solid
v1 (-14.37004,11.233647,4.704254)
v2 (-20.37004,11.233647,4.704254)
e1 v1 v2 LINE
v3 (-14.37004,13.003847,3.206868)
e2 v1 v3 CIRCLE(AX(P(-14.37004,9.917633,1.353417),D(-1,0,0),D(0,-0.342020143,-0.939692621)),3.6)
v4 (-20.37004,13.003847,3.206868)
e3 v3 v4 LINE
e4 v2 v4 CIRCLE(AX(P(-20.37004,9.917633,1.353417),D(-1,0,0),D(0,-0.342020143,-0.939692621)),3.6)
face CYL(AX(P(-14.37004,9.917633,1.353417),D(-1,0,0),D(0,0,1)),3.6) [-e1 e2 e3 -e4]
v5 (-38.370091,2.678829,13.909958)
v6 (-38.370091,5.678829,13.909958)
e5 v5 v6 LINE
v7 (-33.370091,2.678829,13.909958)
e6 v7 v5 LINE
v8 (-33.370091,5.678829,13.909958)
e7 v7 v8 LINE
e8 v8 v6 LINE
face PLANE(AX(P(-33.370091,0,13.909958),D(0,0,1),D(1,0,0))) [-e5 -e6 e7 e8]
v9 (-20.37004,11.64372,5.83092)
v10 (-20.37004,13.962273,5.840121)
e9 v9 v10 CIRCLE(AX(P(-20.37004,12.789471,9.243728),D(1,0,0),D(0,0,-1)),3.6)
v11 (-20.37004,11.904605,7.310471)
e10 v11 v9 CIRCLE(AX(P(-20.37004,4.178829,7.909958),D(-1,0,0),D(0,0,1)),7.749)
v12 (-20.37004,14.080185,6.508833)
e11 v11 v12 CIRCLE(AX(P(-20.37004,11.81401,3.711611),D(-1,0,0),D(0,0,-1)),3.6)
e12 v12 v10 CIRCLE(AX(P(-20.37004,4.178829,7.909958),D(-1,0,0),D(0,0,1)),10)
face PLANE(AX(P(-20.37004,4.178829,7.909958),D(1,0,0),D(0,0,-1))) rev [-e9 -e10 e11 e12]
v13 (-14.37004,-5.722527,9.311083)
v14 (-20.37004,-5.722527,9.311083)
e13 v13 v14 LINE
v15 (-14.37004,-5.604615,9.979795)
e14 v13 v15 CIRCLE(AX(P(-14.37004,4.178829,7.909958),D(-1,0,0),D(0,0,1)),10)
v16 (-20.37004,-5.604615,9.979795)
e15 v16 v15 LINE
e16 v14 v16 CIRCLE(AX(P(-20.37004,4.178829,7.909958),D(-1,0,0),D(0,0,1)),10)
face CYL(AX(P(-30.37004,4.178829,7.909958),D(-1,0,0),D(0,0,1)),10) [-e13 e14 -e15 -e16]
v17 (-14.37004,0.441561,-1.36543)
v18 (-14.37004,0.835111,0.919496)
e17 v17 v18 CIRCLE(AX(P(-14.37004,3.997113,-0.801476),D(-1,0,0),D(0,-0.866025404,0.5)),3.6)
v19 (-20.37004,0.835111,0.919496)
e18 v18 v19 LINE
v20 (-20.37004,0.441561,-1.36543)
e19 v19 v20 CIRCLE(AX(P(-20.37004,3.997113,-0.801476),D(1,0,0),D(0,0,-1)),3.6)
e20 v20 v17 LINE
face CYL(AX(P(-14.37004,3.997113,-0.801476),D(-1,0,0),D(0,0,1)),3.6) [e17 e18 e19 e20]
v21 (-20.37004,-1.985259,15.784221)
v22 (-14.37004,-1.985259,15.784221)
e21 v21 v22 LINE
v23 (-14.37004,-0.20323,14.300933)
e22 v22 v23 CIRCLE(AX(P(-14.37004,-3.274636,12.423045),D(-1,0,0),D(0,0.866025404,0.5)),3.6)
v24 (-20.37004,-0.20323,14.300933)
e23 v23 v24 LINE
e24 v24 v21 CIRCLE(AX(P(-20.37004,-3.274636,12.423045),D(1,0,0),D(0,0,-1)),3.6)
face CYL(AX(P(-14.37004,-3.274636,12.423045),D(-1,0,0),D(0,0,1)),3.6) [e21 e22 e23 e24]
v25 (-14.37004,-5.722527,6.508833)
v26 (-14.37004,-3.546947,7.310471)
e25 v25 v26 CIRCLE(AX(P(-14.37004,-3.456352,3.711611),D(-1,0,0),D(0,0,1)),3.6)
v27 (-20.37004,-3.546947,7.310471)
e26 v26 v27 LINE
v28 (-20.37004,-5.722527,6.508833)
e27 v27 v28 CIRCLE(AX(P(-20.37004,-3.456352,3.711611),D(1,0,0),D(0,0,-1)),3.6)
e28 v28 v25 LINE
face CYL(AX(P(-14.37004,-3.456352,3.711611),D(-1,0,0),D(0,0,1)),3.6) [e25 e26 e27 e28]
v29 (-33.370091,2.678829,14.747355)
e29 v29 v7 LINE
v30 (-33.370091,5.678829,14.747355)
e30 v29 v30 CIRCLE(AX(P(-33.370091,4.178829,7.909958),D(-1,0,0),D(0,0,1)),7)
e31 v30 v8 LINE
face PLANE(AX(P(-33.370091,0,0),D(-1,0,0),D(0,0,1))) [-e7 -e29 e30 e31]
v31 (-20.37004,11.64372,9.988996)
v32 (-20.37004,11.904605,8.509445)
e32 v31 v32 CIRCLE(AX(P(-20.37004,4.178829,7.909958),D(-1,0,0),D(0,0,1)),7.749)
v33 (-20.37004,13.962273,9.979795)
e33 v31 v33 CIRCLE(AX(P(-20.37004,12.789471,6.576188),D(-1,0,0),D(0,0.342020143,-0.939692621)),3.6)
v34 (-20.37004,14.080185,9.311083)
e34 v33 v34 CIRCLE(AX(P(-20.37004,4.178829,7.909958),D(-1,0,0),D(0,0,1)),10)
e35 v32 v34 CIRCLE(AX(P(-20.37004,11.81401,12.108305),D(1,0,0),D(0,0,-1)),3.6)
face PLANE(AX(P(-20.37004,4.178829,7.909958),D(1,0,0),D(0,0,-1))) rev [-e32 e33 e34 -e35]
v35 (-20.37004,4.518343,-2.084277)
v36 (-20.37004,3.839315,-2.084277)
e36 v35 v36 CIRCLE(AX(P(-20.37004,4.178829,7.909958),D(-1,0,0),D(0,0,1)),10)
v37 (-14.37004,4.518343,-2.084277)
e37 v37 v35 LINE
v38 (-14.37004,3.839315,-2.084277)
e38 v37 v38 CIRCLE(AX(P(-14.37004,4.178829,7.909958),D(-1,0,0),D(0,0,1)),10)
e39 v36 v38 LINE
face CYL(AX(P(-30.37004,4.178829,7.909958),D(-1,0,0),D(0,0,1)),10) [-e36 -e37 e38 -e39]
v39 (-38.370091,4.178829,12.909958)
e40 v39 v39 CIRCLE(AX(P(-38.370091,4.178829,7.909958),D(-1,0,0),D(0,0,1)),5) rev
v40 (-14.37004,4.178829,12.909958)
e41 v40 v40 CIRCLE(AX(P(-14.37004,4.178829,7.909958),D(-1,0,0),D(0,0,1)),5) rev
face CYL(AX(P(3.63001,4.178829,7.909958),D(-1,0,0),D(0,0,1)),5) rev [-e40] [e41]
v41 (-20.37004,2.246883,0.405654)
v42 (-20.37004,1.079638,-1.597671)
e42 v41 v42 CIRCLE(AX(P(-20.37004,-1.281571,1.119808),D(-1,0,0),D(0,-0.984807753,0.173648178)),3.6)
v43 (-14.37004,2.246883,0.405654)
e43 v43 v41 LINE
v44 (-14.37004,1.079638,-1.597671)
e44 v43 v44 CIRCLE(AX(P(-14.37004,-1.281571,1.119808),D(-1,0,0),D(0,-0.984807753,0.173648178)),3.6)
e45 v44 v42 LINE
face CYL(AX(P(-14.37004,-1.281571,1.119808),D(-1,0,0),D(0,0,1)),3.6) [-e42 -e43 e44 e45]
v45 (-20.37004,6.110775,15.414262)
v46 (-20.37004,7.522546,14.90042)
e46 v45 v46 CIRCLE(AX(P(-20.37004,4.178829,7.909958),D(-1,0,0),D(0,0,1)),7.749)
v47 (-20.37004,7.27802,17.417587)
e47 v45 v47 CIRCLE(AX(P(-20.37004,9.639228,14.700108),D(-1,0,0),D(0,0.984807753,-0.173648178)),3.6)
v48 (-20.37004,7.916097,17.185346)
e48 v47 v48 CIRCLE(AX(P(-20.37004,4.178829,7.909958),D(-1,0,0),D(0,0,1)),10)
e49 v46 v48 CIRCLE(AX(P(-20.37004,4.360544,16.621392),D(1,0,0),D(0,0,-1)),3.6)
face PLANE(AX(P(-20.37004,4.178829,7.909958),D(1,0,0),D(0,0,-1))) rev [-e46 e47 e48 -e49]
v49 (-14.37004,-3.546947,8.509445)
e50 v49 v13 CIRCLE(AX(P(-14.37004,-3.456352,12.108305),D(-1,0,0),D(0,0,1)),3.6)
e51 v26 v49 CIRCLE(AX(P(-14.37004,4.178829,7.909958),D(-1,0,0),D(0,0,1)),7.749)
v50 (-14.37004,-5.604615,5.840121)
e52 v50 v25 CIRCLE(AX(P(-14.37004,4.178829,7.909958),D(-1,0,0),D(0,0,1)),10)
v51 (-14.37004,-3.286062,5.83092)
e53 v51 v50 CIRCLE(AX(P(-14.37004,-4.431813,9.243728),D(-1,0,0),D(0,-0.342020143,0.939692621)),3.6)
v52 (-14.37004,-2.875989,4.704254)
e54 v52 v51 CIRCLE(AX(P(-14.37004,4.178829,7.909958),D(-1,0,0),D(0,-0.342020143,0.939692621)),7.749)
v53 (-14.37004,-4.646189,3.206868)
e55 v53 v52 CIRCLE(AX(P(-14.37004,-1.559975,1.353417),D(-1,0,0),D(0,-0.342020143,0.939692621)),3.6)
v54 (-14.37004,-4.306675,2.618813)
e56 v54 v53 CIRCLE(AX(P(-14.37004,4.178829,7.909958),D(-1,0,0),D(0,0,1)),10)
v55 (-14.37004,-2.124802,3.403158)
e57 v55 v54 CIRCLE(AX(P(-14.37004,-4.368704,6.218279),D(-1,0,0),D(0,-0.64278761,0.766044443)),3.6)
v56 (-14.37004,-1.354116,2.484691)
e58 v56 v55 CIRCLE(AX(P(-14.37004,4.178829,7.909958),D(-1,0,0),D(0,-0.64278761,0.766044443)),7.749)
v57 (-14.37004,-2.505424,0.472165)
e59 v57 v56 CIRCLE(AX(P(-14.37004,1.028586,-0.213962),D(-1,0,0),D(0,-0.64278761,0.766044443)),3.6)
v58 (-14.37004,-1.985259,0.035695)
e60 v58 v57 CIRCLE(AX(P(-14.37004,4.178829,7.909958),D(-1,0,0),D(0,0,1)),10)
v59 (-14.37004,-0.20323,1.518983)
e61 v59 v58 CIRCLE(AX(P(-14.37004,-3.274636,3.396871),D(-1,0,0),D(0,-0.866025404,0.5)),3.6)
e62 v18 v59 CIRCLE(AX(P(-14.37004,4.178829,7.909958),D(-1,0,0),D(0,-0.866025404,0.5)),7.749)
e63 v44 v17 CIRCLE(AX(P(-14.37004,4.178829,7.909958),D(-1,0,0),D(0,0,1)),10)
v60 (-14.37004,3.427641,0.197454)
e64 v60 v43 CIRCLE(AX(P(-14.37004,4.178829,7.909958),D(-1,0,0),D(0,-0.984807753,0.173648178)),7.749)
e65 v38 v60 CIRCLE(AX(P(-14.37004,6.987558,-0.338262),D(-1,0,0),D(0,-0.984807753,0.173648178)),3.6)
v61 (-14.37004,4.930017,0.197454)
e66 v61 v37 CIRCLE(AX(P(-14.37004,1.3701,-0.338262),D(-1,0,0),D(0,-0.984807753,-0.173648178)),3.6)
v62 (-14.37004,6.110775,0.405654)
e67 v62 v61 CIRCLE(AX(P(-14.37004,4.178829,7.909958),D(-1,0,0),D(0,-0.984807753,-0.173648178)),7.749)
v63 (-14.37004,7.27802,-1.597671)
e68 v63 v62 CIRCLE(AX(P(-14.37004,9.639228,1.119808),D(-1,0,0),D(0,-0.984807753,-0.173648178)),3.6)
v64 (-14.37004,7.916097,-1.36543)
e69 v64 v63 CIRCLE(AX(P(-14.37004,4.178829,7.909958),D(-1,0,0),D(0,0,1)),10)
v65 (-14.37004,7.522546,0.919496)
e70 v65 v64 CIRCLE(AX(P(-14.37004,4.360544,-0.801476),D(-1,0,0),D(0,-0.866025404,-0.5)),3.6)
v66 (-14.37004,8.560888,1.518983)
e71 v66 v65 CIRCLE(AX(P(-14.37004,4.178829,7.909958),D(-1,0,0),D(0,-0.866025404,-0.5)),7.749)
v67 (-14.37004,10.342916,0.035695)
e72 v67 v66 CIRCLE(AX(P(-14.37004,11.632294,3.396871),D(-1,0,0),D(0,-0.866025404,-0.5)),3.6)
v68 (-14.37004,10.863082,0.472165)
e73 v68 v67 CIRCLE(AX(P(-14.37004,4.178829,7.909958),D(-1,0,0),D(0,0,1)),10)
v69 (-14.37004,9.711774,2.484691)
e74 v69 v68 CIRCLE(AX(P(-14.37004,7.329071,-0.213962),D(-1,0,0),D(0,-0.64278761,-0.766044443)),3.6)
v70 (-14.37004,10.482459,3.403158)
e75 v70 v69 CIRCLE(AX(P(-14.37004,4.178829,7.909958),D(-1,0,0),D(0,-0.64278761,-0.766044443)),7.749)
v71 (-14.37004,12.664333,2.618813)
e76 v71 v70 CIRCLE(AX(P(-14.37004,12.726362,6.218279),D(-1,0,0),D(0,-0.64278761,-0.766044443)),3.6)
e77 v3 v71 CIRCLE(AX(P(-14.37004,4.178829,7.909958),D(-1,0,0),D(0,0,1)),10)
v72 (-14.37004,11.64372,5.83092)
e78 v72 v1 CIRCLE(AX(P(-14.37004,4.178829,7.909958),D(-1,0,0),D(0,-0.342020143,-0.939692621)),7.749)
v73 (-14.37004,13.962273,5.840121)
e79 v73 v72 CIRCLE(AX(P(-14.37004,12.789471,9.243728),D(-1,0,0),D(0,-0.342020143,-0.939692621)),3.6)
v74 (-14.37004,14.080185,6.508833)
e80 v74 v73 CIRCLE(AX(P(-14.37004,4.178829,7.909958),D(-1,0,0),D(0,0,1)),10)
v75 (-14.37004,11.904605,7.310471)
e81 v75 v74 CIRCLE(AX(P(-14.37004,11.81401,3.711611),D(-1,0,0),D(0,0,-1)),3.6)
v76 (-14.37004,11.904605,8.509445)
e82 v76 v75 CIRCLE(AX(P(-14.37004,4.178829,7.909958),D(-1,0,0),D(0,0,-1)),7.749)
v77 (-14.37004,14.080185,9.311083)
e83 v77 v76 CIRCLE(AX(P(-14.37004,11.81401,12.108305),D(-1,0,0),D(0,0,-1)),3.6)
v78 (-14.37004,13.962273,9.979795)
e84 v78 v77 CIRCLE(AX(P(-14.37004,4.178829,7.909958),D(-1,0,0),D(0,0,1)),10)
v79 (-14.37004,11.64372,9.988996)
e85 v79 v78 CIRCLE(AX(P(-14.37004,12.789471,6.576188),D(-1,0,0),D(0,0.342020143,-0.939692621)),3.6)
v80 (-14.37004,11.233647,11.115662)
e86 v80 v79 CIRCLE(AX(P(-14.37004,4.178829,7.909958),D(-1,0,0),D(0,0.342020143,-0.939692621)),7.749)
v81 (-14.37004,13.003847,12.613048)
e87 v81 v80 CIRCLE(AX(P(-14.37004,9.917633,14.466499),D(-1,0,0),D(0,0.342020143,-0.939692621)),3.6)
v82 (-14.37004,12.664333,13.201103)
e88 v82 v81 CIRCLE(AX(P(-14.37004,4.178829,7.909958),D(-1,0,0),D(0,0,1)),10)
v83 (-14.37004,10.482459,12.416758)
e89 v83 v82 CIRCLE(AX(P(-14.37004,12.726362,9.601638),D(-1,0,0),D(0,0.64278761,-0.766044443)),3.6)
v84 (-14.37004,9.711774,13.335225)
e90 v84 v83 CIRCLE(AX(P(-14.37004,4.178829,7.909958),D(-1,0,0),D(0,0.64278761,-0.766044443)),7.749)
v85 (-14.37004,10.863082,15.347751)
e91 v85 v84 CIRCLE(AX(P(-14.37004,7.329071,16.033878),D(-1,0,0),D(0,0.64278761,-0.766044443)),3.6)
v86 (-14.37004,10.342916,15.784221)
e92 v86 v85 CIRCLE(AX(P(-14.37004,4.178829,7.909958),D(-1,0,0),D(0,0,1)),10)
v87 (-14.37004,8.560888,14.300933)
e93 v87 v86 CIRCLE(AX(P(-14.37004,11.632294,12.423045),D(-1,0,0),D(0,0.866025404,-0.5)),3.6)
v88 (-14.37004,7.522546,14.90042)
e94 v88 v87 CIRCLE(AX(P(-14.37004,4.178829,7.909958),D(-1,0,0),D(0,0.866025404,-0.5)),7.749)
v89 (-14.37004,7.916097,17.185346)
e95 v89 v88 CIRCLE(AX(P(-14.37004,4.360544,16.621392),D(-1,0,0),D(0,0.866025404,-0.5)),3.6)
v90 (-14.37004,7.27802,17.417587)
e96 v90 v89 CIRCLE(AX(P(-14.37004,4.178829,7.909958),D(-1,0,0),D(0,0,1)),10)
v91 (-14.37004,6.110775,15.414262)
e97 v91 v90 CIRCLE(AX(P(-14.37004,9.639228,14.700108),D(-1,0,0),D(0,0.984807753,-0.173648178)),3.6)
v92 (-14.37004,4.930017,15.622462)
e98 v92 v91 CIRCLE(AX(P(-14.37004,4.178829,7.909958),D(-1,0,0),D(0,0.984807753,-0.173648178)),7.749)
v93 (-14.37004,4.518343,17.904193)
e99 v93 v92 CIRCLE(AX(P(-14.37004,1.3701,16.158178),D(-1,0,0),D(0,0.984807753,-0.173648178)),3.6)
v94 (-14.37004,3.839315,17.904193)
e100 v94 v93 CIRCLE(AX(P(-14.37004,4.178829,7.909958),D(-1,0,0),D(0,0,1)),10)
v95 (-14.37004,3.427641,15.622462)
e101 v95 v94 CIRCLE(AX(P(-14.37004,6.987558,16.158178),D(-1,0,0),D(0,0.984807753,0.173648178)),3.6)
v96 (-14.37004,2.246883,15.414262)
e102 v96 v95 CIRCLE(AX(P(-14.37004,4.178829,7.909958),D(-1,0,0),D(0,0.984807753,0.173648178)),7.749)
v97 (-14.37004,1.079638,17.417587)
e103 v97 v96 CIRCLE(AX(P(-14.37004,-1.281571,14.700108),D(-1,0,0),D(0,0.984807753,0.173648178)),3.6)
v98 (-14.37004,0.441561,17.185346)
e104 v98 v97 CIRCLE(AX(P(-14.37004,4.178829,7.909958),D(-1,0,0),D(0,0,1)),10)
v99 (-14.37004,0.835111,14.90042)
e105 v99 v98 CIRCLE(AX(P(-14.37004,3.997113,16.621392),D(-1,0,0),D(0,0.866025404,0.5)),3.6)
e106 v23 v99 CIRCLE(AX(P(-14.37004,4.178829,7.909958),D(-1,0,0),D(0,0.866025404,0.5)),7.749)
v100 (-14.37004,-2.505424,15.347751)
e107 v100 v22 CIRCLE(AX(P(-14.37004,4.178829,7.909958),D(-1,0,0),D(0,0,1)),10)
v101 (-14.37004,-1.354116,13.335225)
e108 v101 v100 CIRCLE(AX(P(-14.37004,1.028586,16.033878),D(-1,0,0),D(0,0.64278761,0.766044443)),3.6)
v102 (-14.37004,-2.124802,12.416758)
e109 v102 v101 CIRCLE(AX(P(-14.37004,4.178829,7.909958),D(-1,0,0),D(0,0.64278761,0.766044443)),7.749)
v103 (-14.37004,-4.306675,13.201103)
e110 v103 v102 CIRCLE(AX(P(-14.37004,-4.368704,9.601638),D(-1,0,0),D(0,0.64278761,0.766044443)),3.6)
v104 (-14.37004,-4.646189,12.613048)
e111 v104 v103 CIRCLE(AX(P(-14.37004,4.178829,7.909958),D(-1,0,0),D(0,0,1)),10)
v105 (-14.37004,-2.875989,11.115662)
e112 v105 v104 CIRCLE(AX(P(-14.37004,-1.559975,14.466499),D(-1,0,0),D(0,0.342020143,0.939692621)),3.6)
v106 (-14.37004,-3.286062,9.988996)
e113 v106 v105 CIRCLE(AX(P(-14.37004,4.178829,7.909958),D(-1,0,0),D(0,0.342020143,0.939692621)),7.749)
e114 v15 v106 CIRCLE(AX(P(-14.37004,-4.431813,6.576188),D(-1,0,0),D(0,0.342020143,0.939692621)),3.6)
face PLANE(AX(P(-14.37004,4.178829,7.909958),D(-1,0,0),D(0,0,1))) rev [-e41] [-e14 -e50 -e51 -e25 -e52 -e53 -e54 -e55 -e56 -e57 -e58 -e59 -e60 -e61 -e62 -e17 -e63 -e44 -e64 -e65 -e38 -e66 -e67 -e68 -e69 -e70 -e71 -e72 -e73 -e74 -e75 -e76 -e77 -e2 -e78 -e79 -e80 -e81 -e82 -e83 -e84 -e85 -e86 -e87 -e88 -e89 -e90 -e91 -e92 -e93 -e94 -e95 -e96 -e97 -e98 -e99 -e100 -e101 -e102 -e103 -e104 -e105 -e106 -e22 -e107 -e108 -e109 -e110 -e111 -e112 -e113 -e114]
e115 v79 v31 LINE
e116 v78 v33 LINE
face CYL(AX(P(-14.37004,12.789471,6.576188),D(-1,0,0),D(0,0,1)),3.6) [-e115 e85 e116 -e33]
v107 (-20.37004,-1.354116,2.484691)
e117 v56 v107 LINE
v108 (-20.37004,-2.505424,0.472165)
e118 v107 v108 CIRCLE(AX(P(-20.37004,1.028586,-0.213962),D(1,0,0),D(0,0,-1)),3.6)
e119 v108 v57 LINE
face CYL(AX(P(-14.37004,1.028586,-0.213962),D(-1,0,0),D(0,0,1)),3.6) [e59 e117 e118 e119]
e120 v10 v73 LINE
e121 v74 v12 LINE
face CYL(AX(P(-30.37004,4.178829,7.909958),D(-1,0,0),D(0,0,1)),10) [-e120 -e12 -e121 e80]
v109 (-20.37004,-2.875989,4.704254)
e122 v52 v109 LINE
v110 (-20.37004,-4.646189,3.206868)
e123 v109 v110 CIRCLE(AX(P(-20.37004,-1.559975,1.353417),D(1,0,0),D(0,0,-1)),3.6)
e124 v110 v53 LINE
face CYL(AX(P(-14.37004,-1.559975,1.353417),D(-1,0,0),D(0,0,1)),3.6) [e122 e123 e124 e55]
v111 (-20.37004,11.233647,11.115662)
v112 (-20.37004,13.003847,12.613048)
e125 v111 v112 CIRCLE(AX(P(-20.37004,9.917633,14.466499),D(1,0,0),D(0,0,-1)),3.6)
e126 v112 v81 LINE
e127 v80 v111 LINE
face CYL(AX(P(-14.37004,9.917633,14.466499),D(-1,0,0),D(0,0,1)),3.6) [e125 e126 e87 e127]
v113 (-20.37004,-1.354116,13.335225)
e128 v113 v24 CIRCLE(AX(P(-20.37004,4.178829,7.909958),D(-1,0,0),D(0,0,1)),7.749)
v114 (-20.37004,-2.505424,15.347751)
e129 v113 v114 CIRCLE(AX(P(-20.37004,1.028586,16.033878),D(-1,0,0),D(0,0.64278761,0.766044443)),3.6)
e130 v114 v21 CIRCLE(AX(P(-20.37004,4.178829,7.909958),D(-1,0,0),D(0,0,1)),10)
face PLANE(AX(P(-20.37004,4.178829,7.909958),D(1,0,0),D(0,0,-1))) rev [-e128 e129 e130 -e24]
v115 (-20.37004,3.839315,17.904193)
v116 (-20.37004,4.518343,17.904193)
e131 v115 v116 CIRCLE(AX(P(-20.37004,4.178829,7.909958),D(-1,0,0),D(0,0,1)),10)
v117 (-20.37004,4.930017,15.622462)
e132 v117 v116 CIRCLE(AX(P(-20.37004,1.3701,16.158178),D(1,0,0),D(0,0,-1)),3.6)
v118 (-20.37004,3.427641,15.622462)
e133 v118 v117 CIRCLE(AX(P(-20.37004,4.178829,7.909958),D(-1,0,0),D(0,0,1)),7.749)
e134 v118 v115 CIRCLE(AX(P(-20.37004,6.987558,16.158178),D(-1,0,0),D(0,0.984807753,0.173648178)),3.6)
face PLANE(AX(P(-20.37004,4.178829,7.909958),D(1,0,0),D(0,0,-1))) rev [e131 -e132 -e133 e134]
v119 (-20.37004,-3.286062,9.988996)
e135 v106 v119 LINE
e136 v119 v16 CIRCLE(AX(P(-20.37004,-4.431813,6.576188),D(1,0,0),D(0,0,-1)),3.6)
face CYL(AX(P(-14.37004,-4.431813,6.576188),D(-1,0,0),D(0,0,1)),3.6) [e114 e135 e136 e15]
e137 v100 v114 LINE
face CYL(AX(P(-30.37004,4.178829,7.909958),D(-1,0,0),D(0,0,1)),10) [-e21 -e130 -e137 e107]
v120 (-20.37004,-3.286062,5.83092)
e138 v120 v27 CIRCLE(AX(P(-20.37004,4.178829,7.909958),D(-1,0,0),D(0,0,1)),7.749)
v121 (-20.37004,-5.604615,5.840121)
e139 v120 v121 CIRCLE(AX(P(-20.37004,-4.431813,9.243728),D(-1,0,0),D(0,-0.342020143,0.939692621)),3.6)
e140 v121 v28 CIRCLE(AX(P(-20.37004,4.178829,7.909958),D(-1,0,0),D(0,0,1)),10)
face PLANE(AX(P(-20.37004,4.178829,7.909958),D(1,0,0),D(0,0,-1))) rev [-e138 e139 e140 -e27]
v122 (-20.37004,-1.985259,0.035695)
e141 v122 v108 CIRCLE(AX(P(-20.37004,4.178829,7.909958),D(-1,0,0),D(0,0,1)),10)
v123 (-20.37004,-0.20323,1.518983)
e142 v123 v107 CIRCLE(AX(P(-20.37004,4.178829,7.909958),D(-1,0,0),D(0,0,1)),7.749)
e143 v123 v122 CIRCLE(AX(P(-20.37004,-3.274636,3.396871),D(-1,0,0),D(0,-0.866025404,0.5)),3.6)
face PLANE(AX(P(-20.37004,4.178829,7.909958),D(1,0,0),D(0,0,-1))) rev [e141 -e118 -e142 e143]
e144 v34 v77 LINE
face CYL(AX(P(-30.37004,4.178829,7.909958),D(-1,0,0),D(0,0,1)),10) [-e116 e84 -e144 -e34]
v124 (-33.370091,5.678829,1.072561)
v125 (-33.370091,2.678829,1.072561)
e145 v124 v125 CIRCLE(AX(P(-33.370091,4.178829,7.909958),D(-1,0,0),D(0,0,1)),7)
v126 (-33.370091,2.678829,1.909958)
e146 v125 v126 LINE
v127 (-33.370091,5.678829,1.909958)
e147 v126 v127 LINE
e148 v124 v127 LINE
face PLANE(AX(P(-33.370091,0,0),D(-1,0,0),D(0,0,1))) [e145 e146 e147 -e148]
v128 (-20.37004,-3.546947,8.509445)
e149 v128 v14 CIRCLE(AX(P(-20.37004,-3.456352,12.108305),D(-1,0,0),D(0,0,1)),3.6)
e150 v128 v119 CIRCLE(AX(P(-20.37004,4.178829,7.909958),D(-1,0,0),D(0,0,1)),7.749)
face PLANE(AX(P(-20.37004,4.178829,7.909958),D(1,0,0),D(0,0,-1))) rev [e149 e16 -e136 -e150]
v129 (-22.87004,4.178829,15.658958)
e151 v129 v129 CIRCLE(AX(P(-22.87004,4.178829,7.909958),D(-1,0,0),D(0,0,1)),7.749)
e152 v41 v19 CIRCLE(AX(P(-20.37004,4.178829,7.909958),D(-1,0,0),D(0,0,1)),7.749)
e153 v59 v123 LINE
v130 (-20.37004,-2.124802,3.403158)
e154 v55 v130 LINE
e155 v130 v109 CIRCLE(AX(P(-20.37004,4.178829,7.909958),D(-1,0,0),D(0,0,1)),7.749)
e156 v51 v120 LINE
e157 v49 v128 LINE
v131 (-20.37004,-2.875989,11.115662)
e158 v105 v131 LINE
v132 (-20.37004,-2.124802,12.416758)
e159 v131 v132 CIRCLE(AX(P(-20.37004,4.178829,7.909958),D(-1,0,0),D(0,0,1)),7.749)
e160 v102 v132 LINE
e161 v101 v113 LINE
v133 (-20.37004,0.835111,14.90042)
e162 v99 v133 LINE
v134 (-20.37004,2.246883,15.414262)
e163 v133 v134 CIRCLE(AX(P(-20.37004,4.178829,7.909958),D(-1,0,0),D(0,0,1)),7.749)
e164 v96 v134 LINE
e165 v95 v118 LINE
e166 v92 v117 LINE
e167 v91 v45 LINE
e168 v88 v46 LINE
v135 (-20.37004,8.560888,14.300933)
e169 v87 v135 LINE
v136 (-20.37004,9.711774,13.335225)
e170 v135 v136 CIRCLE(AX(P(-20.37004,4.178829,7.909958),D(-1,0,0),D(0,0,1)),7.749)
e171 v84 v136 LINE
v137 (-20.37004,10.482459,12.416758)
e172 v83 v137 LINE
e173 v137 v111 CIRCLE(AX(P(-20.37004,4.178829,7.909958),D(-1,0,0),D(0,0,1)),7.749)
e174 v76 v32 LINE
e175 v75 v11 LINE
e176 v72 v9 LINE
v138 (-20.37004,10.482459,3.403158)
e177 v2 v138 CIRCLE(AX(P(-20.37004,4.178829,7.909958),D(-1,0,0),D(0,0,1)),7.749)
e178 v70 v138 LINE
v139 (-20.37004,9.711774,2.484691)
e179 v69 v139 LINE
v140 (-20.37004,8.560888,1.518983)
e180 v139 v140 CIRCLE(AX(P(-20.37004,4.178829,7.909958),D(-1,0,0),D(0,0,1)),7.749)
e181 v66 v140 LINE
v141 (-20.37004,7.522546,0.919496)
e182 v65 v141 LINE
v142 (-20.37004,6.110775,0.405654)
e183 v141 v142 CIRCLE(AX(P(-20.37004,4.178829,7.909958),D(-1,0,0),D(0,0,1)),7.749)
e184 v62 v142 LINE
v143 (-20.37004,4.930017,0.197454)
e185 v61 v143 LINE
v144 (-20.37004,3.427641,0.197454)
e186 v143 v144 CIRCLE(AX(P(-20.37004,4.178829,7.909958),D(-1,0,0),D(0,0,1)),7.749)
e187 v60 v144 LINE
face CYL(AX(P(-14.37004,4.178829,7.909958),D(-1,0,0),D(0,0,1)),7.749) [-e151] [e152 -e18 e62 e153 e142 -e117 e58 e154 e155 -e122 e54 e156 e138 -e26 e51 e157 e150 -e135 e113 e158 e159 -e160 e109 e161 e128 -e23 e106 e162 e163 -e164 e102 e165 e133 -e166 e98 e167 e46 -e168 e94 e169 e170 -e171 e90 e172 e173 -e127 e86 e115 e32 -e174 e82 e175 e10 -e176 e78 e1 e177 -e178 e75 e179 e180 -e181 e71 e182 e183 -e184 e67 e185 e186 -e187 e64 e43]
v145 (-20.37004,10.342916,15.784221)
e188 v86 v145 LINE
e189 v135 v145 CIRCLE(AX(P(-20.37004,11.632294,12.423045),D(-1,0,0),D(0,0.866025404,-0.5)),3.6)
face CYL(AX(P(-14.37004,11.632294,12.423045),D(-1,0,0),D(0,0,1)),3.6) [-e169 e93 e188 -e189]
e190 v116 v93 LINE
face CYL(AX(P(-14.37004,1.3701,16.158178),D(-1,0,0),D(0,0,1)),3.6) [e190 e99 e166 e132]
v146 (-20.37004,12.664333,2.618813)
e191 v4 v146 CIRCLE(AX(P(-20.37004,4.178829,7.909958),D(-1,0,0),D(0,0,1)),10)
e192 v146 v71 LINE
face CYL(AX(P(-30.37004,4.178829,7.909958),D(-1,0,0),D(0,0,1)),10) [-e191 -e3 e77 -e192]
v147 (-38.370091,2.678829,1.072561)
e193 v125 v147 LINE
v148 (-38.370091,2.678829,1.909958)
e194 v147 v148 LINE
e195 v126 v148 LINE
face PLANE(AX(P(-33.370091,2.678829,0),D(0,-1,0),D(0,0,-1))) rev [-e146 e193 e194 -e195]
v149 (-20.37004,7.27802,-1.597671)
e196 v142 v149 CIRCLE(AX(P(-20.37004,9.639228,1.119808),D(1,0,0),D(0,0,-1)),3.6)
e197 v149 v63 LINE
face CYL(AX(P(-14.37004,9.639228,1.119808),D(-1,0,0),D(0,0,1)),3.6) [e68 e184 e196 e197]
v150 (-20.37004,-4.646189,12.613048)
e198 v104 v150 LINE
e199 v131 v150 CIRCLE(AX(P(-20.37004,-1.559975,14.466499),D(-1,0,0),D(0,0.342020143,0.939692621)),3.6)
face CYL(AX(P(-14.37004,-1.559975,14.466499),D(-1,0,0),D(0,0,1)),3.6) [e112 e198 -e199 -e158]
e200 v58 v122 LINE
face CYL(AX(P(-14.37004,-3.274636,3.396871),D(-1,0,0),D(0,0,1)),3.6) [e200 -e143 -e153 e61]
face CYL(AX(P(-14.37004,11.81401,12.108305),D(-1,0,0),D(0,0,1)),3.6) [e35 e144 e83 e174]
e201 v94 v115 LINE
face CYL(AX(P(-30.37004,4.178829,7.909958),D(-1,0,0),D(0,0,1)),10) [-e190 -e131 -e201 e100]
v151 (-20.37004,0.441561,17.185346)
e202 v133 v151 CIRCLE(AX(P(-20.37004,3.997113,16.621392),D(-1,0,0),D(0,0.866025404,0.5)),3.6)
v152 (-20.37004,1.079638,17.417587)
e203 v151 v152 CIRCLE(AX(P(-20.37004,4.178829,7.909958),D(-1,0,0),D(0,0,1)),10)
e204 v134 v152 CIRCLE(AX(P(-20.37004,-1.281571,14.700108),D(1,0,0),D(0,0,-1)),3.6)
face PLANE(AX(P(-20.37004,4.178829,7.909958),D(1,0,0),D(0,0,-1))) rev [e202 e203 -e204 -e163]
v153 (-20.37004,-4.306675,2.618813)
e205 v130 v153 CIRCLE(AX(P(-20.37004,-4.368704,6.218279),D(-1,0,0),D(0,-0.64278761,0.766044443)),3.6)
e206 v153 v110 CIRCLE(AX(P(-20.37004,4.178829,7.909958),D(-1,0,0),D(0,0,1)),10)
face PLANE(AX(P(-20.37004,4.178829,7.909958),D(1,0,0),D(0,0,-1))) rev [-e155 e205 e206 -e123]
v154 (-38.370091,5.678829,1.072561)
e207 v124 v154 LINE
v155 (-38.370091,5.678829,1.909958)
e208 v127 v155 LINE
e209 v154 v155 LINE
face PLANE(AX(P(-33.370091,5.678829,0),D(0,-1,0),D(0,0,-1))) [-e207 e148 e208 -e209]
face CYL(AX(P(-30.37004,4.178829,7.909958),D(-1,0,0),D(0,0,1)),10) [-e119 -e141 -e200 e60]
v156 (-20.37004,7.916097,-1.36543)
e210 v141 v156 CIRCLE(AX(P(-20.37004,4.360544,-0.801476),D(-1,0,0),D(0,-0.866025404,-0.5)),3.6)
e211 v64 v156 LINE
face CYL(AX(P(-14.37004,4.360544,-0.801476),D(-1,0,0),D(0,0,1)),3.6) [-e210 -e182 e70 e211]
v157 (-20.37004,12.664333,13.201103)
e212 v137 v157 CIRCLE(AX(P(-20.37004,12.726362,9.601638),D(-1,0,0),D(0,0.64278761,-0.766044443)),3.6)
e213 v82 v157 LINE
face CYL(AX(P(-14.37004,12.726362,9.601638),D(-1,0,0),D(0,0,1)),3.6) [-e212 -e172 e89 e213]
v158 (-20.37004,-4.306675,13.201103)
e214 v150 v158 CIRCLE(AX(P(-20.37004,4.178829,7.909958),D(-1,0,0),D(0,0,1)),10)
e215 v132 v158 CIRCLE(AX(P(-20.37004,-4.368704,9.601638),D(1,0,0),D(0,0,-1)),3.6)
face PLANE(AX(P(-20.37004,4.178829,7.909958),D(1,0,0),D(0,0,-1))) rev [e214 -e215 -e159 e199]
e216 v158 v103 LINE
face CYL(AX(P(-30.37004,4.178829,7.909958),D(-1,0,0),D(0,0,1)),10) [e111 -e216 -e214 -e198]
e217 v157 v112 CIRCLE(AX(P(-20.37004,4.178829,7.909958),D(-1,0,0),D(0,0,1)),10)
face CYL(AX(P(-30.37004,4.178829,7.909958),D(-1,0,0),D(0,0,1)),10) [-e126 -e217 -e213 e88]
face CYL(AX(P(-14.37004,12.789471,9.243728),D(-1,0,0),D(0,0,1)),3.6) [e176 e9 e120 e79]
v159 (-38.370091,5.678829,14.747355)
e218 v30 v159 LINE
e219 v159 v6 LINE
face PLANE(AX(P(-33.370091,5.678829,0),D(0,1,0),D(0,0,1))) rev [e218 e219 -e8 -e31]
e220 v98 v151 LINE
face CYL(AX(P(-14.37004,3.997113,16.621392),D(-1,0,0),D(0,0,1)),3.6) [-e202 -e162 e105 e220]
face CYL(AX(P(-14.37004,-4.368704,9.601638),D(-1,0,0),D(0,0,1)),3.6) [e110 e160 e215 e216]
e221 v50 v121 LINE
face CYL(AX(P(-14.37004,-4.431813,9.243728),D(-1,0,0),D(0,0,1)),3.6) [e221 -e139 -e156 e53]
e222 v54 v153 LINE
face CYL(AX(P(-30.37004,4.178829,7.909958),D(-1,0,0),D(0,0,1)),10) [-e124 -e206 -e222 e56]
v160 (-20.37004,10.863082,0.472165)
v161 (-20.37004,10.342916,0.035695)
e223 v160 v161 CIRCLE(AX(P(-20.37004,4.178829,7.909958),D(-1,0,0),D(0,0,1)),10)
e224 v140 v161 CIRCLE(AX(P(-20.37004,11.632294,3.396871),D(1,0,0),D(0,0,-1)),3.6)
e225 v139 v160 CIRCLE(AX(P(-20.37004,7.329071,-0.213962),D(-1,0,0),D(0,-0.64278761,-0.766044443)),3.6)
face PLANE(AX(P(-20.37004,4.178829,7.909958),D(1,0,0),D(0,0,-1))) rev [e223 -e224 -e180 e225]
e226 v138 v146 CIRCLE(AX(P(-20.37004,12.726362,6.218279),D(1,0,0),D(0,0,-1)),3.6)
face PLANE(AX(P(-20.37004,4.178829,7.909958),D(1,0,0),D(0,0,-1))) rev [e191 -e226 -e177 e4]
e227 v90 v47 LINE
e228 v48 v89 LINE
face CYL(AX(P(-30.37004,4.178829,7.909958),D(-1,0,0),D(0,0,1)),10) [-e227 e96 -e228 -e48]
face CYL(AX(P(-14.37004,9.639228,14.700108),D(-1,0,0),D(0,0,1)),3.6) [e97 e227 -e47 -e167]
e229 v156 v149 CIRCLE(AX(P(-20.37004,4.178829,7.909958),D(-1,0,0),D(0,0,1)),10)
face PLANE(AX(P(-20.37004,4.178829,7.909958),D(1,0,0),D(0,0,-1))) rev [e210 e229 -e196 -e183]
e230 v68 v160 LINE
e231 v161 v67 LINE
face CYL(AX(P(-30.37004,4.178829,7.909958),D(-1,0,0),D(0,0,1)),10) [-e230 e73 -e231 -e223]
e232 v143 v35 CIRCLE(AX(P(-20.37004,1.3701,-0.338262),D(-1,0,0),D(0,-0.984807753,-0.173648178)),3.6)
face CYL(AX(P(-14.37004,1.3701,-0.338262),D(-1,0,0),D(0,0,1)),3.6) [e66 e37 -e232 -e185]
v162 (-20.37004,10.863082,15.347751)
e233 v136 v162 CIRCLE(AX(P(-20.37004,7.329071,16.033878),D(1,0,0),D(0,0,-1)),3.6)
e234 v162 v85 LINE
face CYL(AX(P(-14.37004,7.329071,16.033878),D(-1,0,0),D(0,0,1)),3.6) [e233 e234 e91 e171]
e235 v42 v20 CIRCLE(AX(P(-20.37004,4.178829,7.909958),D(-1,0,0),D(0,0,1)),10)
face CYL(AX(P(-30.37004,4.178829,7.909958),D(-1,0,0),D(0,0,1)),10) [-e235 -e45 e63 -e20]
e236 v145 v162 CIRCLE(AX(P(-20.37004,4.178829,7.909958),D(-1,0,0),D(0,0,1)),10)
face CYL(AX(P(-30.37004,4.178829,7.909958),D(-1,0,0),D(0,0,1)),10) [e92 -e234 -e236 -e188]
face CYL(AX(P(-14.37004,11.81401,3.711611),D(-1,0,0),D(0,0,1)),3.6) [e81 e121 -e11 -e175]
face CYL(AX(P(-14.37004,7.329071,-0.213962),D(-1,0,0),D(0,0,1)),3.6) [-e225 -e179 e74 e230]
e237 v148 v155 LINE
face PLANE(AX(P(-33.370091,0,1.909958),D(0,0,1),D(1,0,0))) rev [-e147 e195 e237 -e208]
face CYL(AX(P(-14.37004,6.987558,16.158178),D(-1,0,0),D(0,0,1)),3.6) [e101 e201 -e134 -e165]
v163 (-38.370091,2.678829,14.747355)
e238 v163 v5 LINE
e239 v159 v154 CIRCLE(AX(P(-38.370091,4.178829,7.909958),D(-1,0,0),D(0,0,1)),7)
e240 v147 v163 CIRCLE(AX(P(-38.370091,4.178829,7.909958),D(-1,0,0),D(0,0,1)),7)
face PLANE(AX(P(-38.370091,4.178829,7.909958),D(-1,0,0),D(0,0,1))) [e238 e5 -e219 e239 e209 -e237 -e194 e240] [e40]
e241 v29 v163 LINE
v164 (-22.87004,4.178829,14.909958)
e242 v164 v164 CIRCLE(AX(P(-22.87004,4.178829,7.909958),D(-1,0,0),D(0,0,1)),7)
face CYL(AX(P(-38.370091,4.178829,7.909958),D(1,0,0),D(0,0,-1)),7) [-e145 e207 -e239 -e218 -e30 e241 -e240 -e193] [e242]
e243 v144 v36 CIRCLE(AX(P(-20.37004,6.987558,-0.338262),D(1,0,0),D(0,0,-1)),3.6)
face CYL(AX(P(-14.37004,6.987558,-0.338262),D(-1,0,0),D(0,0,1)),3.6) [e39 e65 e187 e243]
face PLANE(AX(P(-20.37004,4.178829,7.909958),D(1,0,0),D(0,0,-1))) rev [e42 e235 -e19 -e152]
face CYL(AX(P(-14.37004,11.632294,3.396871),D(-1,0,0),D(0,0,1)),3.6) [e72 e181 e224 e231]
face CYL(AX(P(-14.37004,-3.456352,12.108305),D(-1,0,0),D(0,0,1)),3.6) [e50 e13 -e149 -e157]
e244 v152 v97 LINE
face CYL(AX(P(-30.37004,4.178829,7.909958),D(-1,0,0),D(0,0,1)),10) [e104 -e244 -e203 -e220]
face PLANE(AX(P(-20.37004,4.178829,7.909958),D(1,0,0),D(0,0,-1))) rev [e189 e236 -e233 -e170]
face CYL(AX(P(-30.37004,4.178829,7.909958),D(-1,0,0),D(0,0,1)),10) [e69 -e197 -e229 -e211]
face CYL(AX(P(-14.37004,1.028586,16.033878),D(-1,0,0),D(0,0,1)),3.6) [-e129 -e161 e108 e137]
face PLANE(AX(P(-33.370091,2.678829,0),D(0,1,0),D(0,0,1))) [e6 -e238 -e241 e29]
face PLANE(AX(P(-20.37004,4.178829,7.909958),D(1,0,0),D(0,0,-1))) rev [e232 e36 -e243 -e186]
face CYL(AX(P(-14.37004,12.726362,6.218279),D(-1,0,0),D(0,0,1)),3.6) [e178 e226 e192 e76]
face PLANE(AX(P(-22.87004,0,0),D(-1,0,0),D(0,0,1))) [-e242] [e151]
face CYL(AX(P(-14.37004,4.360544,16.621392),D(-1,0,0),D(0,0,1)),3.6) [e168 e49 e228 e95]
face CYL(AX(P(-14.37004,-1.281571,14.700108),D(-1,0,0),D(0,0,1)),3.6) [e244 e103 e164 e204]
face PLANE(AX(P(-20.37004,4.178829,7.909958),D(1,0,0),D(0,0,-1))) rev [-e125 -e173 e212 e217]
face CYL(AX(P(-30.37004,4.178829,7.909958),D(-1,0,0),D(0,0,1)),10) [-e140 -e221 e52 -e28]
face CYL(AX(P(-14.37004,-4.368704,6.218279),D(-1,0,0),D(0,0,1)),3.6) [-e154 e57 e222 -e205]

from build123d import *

# Parameters (mm, degrees)
SPUR_START                = -38.37009116
SPUR_GEAR_ISO_OUTLINE_R   = 7
SPUR_GEAR_ISO_OUTLINE_R_2 = 5
SPUR_GEAR_ISO_DEPTH       = 24.0000508
SPUR_START_2              = -20.37004036
SPUR_GEAR_ISO_2_OUTLINE_R = 7
SPUR_GEAR_ISO_2_DEPTH     = 6
CUT_EXTRUDE1_DEPTH        = 5
BOSS_EXTRUDE1_START       = 2.5
SKETCH2_R                 = 7.749
SKETCH2_R_2               = 7
BOSS_EXTRUDE1_DEPTH       = 2.5


# Read off the part's stored shape, not the designer's step: spur gear_iso
with BuildPart() as part:
    # spur gear_iso outline → spur gear_iso (new body)
    with BuildSketch(Plane.YZ.offset(SPUR_START)):
        with Locations((4.178828844, 7.909958029)):
            Circle(SPUR_GEAR_ISO_OUTLINE_R)
        with Locations((4.178828844, 7.909958029)):
            Circle(SPUR_GEAR_ISO_OUTLINE_R_2, mode=Mode.SUBTRACT)
    extrude(amount=SPUR_GEAR_ISO_DEPTH)

    # spur gear_iso 2 outline → spur gear_iso 2 (add)
    with BuildSketch(Plane.YZ.offset(SPUR_START_2)):
        with BuildLine():
            ThreePointArc((10.863081906, 15.347750779), (10.606704941, 15.57040246), (10.342916446, 15.784221425))
            ThreePointArc((10.342916446, 15.784221425), (9.329220993, 15.189966754), (8.560887593, 14.300933081))
            ThreePointArc((8.560887593, 14.300933081), (8.053328844, 14.620788883), (7.522546219, 14.900419753))
            ThreePointArc((7.522546219, 14.900419753), (7.908305264, 16.010332833), (7.916097179, 17.185346182))
            ThreePointArc((7.916097179, 17.185346182), (7.599030277, 17.306884237), (7.278019782, 17.417587362))
            ThreePointArc((7.278019782, 17.417587362), (6.528704713, 16.512466369), (6.110774911, 15.414262487))
            ThreePointArc((6.110774911, 15.414262487), (5.524428573, 15.541233307), (4.930016667, 15.622462023))
            ThreePointArc((4.930016667, 15.622462023), (4.912898964, 16.797376517), (4.518342735, 17.904192883))
            ThreePointArc((4.518342735, 17.904192883), (4.178828843, 17.909958029), (3.839314952, 17.904192883))
            ThreePointArc((3.839314952, 17.904192883), (3.444758723, 16.797376517), (3.427641021, 15.622462023))
            ThreePointArc((3.427641021, 15.622462023), (2.833229115, 15.541233307), (2.246882776, 15.414262487))
            ThreePointArc((2.246882776, 15.414262487), (1.828952974, 16.512466369), (1.079637905, 17.417587362))
            ThreePointArc((1.079637905, 17.417587362), (0.75862741, 17.306884237), (0.441560508, 17.185346182))
            ThreePointArc((0.441560508, 17.185346182), (0.449352423, 16.010332833), (0.835111468, 14.900419753))
            ThreePointArc((0.835111468, 14.900419753), (0.304328844, 14.620788883), (-0.203229906, 14.300933081))
            ThreePointArc((-0.203229906, 14.300933081), (-0.971563306, 15.189966754), (-1.985258759, 15.784221425))
            ThreePointArc((-1.985258759, 15.784221425), (-2.249047253, 15.57040246), (-2.505424219, 15.347750779))
            ThreePointArc((-2.505424219, 15.347750779), (-2.09622398, 14.246264397), (-1.354116421, 13.335224631))
            ThreePointArc((-1.354116421, 13.335224631), (-1.757249546, 12.890919217), (-2.12480163, 12.416757764))
            ThreePointArc((-2.12480163, 12.416757764), (-3.150866281, 12.989390646), (-4.306675485, 13.201103111))
            ThreePointArc((-4.306675485, 13.201103111), (-4.481425194, 12.909958029), (-4.646189377, 12.613047801))
            ThreePointArc((-4.646189377, 12.613047801), (-3.884936401, 11.717943901), (-2.875989453, 11.115662288))
            ThreePointArc((-2.875989453, 11.115662288), (-3.102849275, 10.56027212), (-3.286062488, 9.988995885))
            ThreePointArc((-3.286062488, 9.988995885), (-4.446099849, 10.17616), (-5.604615157, 9.979794611))
            ThreePointArc((-5.604615157, 9.979794611), (-5.669248686, 9.646439806), (-5.722527095, 9.311082786))
            ThreePointArc((-5.722527095, 9.311082786), (-4.701039727, 8.730324108), (-3.546947281, 8.509444701))
            ThreePointArc((-3.546947281, 8.509444701), (-3.570171156, 7.909958029), (-3.546947281, 7.310471357))
            ThreePointArc((-3.546947281, 7.310471357), (-4.701039727, 7.089591951), (-5.722527095, 6.508833272))
            ThreePointArc((-5.722527095, 6.508833272), (-5.669248686, 6.173476252), (-5.604615157, 5.840121447))
            ThreePointArc((-5.604615157, 5.840121447), (-4.446099849, 5.643756058), (-3.286062488, 5.830920173))
            ThreePointArc((-3.286062488, 5.830920173), (-3.102849275, 5.259643938), (-2.875989453, 4.70425377))
            ThreePointArc((-2.875989453, 4.70425377), (-3.884936402, 4.101972158), (-4.646189377, 3.206868257))
            ThreePointArc((-4.646189377, 3.206868257), (-4.481425194, 2.909958029), (-4.306675485, 2.618812947))
            ThreePointArc((-4.306675485, 2.618812947), (-3.15086628, 2.830525412), (-2.12480163, 3.403158295))
            ThreePointArc((-2.12480163, 3.403158295), (-1.757249546, 2.928996842), (-1.354116421, 2.484691427))
            ThreePointArc((-1.354116421, 2.484691427), (-2.09622398, 1.573651661), (-2.505424219, 0.472165279))
            ThreePointArc((-2.505424219, 0.472165279), (-2.249047253, 0.249513598), (-1.985258759, 0.035694633))
            ThreePointArc((-1.985258759, 0.035694633), (-0.971563306, 0.629949304), (-0.203229906, 1.518982977))
            ThreePointArc((-0.203229906, 1.518982977), (0.304328844, 1.199127175), (0.835111468, 0.919496305))
            ThreePointArc((0.835111468, 0.919496305), (0.449352423, -0.190416775), (0.441560508, -1.365430124))
            ThreePointArc((0.441560508, -1.365430124), (0.75862741, -1.486968179), (1.079637905, -1.597671303))
            ThreePointArc((1.079637905, -1.597671303), (1.828952974, -0.69255031), (2.246882776, 0.405653572))
            ThreePointArc((2.246882776, 0.405653572), (2.833229115, 0.278682751), (3.427641021, 0.197454035))
            ThreePointArc((3.427641021, 0.197454035), (3.444758723, -0.977460459), (3.839314952, -2.084276825))
            ThreePointArc((3.839314952, -2.084276825), (4.178828843, -2.090041971), (4.518342735, -2.084276825))
            ThreePointArc((4.518342735, -2.084276825), (4.912898964, -0.977460459), (4.930016667, 0.197454035))
            ThreePointArc((4.930016667, 0.197454035), (5.524428573, 0.278682751), (6.110774911, 0.405653572))
            ThreePointArc((6.110774911, 0.405653572), (6.528704713, -0.69255031), (7.278019782, -1.597671303))
            ThreePointArc((7.278019782, -1.597671303), (7.599030277, -1.486968179), (7.916097179, -1.365430124))
            ThreePointArc((7.916097179, -1.365430124), (7.908305264, -0.190416775), (7.522546219, 0.919496305))
            ThreePointArc((7.522546219, 0.919496305), (8.053328844, 1.199127175), (8.560887593, 1.518982977))
            ThreePointArc((8.560887593, 1.518982977), (9.329220993, 0.629949304), (10.342916446, 0.035694633))
            ThreePointArc((10.342916446, 0.035694633), (10.606704941, 0.249513598), (10.863081906, 0.472165279))
            ThreePointArc((10.863081906, 0.472165279), (10.453881667, 1.573651661), (9.711774108, 2.484691427))
            ThreePointArc((9.711774108, 2.484691427), (10.114907233, 2.928996842), (10.482459318, 3.403158295))
            ThreePointArc((10.482459318, 3.403158295), (11.508523968, 2.830525412), (12.664333173, 2.618812947))
            ThreePointArc((12.664333173, 2.618812947), (12.839082882, 2.909958029), (13.003847064, 3.206868257))
            ThreePointArc((13.003847064, 3.206868257), (12.242594089, 4.101972158), (11.233647141, 4.70425377))
            ThreePointArc((11.233647141, 4.70425377), (11.460506962, 5.259643939), (11.643720175, 5.830920173))
            ThreePointArc((11.643720175, 5.830920173), (12.803757537, 5.643756058), (13.962272845, 5.840121447))
            ThreePointArc((13.962272845, 5.840121447), (14.026906374, 6.173476252), (14.080184782, 6.508833272))
            ThreePointArc((14.080184782, 6.508833272), (13.058697415, 7.089591951), (11.904604969, 7.310471357))
            ThreePointArc((11.904604969, 7.310471357), (11.927828844, 7.909958029), (11.904604969, 8.509444701))
            ThreePointArc((11.904604969, 8.509444701), (13.058697414, 8.730324108), (14.080184782, 9.311082786))
            ThreePointArc((14.080184782, 9.311082786), (14.026906374, 9.646439806), (13.962272845, 9.979794611))
            ThreePointArc((13.962272845, 9.979794611), (12.803757537, 10.17616), (11.643720175, 9.988995885))
            ThreePointArc((11.643720175, 9.988995885), (11.460506962, 10.56027212), (11.233647141, 11.115662288))
            ThreePointArc((11.233647141, 11.115662288), (12.242594089, 11.717943901), (13.003847064, 12.613047801))
            ThreePointArc((13.003847064, 12.613047801), (12.839082882, 12.909958029), (12.664333173, 13.201103111))
            ThreePointArc((12.664333173, 13.201103111), (11.508523969, 12.989390646), (10.482459318, 12.416757764))
            ThreePointArc((10.482459318, 12.416757764), (10.114907233, 12.890919217), (9.711774108, 13.335224631))
            ThreePointArc((9.711774108, 13.335224631), (10.453881667, 14.246264397), (10.863081906, 15.347750779))
        make_face()
        with Locations((4.178828844, 7.909958029)):
            Circle(SPUR_GEAR_ISO_2_OUTLINE_R, mode=Mode.SUBTRACT)
    extrude(amount=SPUR_GEAR_ISO_2_DEPTH)

    # Sketch1 → Cut-Extrude1 (cut)
    with BuildSketch(Plane.ZY.offset(38.37009116)):
        with BuildLine():
            ThreePointArc((1.072560864, 5.678828844), (0.909958029, 4.178828844), (1.072560864, 2.678828844))
            Line((1.072560864, 2.678828844), (1.909958029, 2.678828844))
            Line((1.909958029, 2.678828844), (1.909958029, 5.678828844))
            Line((1.909958029, 5.678828844), (1.072560864, 5.678828844))
        make_face()
        with BuildLine():
            Line((13.909958029, 2.678828844), (14.747355195, 2.678828844))
            ThreePointArc((14.747355195, 2.678828844), (14.869188596, 3.4244351), (14.909958029, 4.178828844))
            ThreePointArc((14.909958029, 4.178828844), (14.869188596, 4.933222587), (14.747355195, 5.678828844))
            Line((14.747355195, 5.678828844), (13.909958029, 5.678828844))
            Line((13.909958029, 5.678828844), (13.909958029, 2.678828844))
        make_face()
    extrude(amount=-CUT_EXTRUDE1_DEPTH, mode=Mode.SUBTRACT)

    # Sketch2 → Boss-Extrude1 (add)
    with BuildSketch(Plane.ZY.offset(20.37004036).offset(BOSS_EXTRUDE1_START)):
        with Locations((7.909958029, 4.178828844)):
            Circle(SKETCH2_R)
        with Locations(Location((7.909958029, 4.178828844, 0), (0, 0, 192.373625116))):
            Circle(SKETCH2_R_2, mode=Mode.SUBTRACT)
    extrude(amount=-BOSS_EXTRUDE1_DEPTH)


solid = part.part
